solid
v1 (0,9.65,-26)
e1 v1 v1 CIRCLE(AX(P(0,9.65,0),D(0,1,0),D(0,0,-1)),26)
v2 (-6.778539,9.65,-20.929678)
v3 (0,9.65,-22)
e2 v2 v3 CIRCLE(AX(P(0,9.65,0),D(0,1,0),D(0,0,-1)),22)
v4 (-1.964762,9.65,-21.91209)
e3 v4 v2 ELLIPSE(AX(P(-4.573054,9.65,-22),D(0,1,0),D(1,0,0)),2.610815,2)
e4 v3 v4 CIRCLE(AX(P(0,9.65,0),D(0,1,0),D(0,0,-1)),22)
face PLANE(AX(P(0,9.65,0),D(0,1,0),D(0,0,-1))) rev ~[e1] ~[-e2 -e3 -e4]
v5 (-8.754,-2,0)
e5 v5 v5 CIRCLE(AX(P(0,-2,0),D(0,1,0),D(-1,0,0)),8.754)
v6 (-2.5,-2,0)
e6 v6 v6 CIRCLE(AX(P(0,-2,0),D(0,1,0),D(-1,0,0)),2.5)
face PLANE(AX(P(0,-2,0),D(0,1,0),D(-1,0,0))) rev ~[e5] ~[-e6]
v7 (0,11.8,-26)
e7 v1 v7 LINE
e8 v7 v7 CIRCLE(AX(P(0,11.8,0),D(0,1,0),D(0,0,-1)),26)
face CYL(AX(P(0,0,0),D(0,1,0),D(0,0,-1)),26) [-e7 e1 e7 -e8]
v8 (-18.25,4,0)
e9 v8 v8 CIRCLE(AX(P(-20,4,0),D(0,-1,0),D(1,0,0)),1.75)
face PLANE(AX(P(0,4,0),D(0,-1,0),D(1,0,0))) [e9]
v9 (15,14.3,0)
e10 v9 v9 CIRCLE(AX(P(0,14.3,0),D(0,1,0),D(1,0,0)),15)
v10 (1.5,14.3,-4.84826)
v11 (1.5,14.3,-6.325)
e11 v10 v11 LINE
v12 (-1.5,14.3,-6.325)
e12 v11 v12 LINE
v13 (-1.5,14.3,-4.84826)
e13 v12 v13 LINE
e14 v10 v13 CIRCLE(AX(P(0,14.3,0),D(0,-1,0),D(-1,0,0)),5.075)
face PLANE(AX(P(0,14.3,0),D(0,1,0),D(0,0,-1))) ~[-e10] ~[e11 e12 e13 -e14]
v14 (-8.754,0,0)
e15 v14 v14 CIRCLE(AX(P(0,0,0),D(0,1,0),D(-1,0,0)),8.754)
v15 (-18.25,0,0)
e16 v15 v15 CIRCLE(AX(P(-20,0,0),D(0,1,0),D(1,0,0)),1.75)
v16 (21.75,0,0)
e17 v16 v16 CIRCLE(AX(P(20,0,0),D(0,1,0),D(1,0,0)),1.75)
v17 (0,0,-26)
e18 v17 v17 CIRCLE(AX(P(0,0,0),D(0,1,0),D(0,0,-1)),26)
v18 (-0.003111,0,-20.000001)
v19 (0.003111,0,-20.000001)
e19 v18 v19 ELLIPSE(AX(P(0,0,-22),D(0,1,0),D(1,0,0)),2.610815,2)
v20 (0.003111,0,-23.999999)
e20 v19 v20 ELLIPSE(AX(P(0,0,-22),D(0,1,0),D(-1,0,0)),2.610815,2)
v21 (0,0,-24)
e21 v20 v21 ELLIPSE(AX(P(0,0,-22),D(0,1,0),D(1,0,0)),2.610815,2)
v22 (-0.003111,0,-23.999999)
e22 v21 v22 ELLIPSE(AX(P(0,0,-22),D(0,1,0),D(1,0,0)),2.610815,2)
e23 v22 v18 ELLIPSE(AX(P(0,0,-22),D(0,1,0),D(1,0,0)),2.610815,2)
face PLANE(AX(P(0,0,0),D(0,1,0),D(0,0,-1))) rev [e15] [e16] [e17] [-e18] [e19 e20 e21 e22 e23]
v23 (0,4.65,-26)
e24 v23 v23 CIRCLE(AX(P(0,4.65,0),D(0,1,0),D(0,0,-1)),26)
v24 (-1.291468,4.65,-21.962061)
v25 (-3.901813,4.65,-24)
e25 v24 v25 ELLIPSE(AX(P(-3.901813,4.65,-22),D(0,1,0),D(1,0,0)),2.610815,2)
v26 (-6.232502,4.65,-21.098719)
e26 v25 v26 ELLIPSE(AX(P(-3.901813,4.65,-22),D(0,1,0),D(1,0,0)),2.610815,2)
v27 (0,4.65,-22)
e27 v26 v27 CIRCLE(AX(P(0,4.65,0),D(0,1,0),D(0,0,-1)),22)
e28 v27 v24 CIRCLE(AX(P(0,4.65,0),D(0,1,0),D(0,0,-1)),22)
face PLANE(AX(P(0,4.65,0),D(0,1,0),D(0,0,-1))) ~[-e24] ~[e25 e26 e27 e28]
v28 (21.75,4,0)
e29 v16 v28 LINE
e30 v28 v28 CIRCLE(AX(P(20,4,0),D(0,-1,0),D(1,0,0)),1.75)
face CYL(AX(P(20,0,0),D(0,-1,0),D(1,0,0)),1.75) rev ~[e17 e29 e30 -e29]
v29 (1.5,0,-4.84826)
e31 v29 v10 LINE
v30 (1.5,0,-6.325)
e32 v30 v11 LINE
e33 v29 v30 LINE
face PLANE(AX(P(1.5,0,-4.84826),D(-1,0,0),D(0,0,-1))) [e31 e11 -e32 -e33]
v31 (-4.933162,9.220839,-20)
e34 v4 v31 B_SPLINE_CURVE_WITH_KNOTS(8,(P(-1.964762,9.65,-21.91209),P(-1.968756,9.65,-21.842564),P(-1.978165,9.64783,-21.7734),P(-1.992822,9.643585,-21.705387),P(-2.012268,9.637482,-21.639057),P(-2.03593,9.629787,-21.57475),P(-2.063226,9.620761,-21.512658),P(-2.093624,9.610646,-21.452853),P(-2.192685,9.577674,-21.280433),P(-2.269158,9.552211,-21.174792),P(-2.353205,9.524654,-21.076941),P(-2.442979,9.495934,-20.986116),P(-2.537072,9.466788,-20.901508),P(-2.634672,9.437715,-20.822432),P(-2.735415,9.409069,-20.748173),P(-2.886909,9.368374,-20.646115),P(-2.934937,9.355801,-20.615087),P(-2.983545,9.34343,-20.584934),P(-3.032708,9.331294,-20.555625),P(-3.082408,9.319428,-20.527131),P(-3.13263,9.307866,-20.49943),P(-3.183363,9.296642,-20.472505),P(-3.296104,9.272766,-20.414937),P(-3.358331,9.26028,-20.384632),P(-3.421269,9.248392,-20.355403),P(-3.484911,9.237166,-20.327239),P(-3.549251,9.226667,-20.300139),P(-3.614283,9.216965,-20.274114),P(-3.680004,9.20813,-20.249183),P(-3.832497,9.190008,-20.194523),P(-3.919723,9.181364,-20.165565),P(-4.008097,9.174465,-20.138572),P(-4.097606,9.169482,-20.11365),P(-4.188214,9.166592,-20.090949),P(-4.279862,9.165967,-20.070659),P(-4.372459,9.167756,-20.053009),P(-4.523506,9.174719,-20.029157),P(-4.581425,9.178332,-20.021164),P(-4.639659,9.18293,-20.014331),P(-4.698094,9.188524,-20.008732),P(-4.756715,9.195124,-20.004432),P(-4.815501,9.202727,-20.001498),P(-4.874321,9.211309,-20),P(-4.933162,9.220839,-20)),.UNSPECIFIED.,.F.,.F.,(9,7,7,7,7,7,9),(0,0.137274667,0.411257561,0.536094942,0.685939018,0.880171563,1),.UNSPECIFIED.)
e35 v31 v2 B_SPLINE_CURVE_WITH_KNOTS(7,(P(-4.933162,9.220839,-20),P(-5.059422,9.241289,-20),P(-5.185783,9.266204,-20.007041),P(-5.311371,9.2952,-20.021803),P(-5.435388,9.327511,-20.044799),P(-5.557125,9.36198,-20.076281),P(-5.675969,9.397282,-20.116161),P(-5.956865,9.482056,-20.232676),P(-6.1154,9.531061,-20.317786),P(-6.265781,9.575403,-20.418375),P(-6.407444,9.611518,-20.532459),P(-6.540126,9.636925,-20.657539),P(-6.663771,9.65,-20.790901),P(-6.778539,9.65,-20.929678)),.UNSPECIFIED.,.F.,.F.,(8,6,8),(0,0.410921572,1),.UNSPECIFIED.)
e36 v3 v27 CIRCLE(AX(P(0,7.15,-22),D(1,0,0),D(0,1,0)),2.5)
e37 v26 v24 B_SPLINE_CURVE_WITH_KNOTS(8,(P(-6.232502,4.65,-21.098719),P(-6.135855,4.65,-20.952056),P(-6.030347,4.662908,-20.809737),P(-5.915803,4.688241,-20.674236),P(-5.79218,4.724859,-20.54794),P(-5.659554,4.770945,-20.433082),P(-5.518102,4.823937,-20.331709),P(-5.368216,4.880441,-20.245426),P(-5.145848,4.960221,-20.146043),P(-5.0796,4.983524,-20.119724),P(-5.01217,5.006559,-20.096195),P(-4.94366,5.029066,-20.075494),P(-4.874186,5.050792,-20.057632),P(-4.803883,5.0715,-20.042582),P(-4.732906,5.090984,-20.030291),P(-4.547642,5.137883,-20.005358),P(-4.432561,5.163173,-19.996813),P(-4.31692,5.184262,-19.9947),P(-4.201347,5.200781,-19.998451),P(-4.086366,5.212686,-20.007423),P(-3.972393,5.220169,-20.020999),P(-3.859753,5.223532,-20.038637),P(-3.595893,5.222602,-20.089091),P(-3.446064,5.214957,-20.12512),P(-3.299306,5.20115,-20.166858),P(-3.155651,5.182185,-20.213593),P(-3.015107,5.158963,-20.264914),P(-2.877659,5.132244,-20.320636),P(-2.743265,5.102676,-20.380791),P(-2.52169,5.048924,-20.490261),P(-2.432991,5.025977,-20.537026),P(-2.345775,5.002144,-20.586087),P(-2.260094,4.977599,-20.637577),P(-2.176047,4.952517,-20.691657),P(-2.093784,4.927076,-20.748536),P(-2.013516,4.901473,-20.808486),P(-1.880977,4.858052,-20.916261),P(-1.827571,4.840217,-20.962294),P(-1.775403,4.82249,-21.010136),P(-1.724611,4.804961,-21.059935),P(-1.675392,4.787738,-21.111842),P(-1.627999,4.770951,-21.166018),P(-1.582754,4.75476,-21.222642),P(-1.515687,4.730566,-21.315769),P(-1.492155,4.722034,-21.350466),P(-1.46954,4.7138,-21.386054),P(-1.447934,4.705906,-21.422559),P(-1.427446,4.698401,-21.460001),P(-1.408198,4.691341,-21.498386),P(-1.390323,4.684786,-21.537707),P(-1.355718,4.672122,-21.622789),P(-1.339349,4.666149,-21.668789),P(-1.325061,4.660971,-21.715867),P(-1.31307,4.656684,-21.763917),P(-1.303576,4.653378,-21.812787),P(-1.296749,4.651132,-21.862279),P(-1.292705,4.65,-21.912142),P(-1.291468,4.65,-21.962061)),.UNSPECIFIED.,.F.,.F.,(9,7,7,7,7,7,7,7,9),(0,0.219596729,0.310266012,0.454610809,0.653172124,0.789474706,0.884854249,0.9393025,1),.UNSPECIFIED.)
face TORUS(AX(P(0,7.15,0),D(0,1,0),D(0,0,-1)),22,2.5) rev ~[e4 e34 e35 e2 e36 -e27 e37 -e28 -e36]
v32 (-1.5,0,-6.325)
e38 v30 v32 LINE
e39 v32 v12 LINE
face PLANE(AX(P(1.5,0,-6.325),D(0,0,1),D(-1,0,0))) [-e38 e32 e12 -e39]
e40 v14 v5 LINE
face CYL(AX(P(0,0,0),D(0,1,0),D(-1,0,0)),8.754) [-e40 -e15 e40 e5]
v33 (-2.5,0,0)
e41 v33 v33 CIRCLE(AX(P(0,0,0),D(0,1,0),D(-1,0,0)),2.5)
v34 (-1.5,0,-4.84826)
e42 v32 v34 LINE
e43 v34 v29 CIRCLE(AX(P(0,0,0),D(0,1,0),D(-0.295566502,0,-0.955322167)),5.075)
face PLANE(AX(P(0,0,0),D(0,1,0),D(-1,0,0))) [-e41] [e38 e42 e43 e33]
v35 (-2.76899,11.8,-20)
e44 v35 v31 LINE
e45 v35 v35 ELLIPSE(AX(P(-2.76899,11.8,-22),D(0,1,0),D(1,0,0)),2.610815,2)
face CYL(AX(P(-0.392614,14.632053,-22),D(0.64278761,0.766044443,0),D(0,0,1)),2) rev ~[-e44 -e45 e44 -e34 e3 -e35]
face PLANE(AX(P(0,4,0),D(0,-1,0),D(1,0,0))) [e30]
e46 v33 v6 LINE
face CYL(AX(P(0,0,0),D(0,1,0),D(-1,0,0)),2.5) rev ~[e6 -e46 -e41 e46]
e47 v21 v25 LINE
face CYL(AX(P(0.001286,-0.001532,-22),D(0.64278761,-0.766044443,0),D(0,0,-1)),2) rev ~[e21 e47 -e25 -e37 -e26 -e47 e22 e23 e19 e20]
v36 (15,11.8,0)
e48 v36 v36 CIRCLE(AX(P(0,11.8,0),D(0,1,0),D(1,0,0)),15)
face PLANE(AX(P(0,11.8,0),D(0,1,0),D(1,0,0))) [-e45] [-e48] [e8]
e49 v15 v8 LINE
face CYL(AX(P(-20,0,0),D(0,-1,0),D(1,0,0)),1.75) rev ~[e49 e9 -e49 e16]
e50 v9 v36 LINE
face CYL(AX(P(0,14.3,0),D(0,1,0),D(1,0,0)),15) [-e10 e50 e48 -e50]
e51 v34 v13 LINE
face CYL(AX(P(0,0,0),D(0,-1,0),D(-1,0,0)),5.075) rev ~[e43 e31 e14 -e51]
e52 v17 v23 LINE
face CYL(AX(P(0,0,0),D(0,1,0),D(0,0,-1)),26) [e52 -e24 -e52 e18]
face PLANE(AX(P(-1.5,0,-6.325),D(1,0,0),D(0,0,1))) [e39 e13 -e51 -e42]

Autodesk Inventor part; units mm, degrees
ref_plane "YZ Plane" through (0, 0, 0) normal (1, 0, 0) x (0, 1, 0)
sketch "Sketch1" plane through (0, 0, 0) normal (0, 1, 0) x (-1, 0, 0)
  circle A0 centre (0, 0) radius 5.075
  circle A1 centre (0, 0) radius 20
  line L0 (1.5, -3.825) -> (-1.5, -3.825)
  line L1 (-1.5, -3.825) -> (-1.5, -6.325)
  line L2 (-1.5, -6.325) -> (1.5, -6.325)
  line L3 (1.5, -6.325) -> (1.5, -3.825)
  line L4 (1.5, -3.825) -> (-1.5, -6.325) construction
  line L5 (-1.5, -3.825) -> (1.5, -6.325) construction
  circle A2 centre (0, 0) radius 2.5
  circle A3 centre (0, 0) radius 8.754
  point P0 (0, -5.075)
  point P1 (-1.5, -4.8483)
  point P2 (1.5, -4.8483)
  dimension "d0" = 10.15
  dimension "d1" = 40
  dimension "d2" = 1.25
  dimension "d3" = 3
  dimension "d17" = 5
extrude "Extrusion1" add sketch "Sketch1" along normal blind 14.3 contours A1 | A3
sketch "Sketch2" plane through (0, 0, 0) normal (1, 0, 0) x (0, 1, 0)
  line L0 (0, 0) -> (14.3, 0)
  line L1 (14.3, 0) -> (14.3, -22)
  line L2 (14.3, -22) -> (0, -22) construction
  line L3 (0, -22) -> (0, 0)
  line L4 (0, -22) -> (14.3, -22) construction
  line L5 (14.3, -22) -> (14.3, -20.0661)
  line L6 (0, -20) -> (14.3, -20) projected
  circle A0 centre (7.15, -22) radius 2.5
  line L7 (9.65, -22) -> (4.65, -22)
  line L8 (4.65, -22) -> (4.65, -26)
  line L9 (4.65, -26) -> (9.65, -26)
  line L10 (9.65, -26) -> (9.65, -22)
  line L11 (14.3, -20) -> (0, -20)
  line L12 (0, -20) -> (0, -26)
  line L13 (0, -26) -> (14.3, -26)
  line L14 (14.3, -26) -> (14.3, -20)
  point P0 (5.65, -20)
  point P1 (14.3, -22)
  point P2 (14.3, -20)
  point P3 (8.65, -20)
  point P4 (14.3, -20)
  point P5 (8.65, -20)
  dimension "d22" = 5
  dimension "d7" = 22
  dimension "d10" = 14.3
  dimension "d23" = 4
  dimension "d31" = 6
  dimension "d41" = 14.3
  dimension "d42" = 5
revolve "Revolution1" add sketch "Sketch2" angle 360 about axis through (0, 0, 0) along (0, 1, 0) contours L0 L1 L6 A0 L3 | L6 A0 L8 L13 L12 L3 | L1 L14 L13 L10 A0 L6 | A0 L6
extrude "Extrusion3" add sketch "Sketch1" against normal blind 2 contours A0 L3 L0 L1 | L1 L0 L3 A0 | A0 L3 L2 L1 | A3
revolve "Revolution4" cut sketch "Sketch2" angle 360 about axis through (0, 0, 0) along (0, 1, 0) contours A0 L6
sketch "Sketch3" plane through (0, 0, 0) normal (0, -1, 0) x (1, 0, 0)
  line L0 (0, 0) -> (0, -22)
  dimension "d25" = 22
ref_plane "Work Plane1" through (0, 0, 0) normal (0.6427876, -0.7660444, 0) x (0, 0, -1)
sketch "Sketch4" plane through (0, 0, 0) normal (0.6427876, -0.7660444, 0) x (0, 0, -1)
  ellipse E0 centre (0, 2.7318) end of major axis (22, 2.7318) minor radius 16.853 projected
  line L0 (0, 0) -> (22, 0)
  circle A0 centre (22, 0) radius 2
  dimension "d27" = 22
  dimension "d28" = 4
extrude "Extrusion4" cut sketch "Sketch4" against normal blind 9 contours A0 L0 E0 | E0 A0 | E0 L0 A0 picked at (22.5049, 0.1658)
extrude "Extrusion5" cut sketch "Sketch4" along normal blind 7 contours A0 L0 E0 | E0 A0 | E0 L0 A0 picked at (22.5049, 0.1658)
ref_plane "Work Plane2" through (0, 14.3, -22) normal (0.6427876, 0.7660444, 0) x (0, 0, 1)
sketch "Sketch5" plane through (0, 14.3, -22) normal (0.6427876, 0.7660444, 0) x (0, 0, 1)
  ellipse E0 centre (22, -0.5142) end of major axis (27.075, -0.5142) minor radius 3.8877 (17.1517, -1.6633) -> (17.1517, 0.6348) ccw projected
  line L0 (22, -0.5142) -> (0, -0.5142)
  circle A0 centre (0, -0.5142) radius 2
  point P0 (22, 9.1919)
  dimension "d35" = 22
  dimension "d36" = 4
extrude "Extrusion6" cut sketch "Sketch5" against normal blind 9
extrude "Extrusion7" cut sketch "Sketch5" along normal blind 8
extrude "Extrusion8" cut sketch "Sketch1" along normal through all contours A0 L3 L0 L1 | L1 L0 L3 A0 | A0 L3 L2 L1 | A2
sketch "Sketch6" plane through (0, 14.3, 0) normal (0, 1, 0) x (1, 0, 0)
  circle A0 centre (0, 0) radius 15
  circle A1 centre (0, 0) radius 35.6972
  dimension "d45" = 30
extrude "Extrusion9" cut sketch "Sketch6" against normal blind 2.5
sketch "Sketch7" plane through (0, 0, 0) normal (0, -1, 0) x (1, 0, 0)
  circle A0 centre (0, 0) radius 2.5 projected
  circle A1 centre (0, 0) radius 20
  line L0 (24, -7.5) -> (-24, -7.5)
  line L1 (-24, -7.5) -> (-24, 7.5)
  line L2 (-24, 7.5) -> (24, 7.5)
  line L3 (24, 7.5) -> (24, -7.5)
  line L4 (24, -7.5) -> (-24, 7.5) construction
  line L5 (-24, -7.5) -> (24, 7.5) construction
  circle A2 centre (0, 0) radius 11
  circle A3 centre (20, 0) radius 1.75
  circle A4 centre (-20, 0) radius 1.75
  dimension "d48" = 40
  dimension "d49" = 48
  dimension "d50" = 15
  dimension "d51" = 22
  dimension "d52" = 3.5
  dimension "d53" = 3.5
extrude "Extrusion10" cut sketch "Sketch7" against normal blind 4 contours A1 A3 | A1 A3 | A4 A1 | A1 A4
properties part number "spool"
